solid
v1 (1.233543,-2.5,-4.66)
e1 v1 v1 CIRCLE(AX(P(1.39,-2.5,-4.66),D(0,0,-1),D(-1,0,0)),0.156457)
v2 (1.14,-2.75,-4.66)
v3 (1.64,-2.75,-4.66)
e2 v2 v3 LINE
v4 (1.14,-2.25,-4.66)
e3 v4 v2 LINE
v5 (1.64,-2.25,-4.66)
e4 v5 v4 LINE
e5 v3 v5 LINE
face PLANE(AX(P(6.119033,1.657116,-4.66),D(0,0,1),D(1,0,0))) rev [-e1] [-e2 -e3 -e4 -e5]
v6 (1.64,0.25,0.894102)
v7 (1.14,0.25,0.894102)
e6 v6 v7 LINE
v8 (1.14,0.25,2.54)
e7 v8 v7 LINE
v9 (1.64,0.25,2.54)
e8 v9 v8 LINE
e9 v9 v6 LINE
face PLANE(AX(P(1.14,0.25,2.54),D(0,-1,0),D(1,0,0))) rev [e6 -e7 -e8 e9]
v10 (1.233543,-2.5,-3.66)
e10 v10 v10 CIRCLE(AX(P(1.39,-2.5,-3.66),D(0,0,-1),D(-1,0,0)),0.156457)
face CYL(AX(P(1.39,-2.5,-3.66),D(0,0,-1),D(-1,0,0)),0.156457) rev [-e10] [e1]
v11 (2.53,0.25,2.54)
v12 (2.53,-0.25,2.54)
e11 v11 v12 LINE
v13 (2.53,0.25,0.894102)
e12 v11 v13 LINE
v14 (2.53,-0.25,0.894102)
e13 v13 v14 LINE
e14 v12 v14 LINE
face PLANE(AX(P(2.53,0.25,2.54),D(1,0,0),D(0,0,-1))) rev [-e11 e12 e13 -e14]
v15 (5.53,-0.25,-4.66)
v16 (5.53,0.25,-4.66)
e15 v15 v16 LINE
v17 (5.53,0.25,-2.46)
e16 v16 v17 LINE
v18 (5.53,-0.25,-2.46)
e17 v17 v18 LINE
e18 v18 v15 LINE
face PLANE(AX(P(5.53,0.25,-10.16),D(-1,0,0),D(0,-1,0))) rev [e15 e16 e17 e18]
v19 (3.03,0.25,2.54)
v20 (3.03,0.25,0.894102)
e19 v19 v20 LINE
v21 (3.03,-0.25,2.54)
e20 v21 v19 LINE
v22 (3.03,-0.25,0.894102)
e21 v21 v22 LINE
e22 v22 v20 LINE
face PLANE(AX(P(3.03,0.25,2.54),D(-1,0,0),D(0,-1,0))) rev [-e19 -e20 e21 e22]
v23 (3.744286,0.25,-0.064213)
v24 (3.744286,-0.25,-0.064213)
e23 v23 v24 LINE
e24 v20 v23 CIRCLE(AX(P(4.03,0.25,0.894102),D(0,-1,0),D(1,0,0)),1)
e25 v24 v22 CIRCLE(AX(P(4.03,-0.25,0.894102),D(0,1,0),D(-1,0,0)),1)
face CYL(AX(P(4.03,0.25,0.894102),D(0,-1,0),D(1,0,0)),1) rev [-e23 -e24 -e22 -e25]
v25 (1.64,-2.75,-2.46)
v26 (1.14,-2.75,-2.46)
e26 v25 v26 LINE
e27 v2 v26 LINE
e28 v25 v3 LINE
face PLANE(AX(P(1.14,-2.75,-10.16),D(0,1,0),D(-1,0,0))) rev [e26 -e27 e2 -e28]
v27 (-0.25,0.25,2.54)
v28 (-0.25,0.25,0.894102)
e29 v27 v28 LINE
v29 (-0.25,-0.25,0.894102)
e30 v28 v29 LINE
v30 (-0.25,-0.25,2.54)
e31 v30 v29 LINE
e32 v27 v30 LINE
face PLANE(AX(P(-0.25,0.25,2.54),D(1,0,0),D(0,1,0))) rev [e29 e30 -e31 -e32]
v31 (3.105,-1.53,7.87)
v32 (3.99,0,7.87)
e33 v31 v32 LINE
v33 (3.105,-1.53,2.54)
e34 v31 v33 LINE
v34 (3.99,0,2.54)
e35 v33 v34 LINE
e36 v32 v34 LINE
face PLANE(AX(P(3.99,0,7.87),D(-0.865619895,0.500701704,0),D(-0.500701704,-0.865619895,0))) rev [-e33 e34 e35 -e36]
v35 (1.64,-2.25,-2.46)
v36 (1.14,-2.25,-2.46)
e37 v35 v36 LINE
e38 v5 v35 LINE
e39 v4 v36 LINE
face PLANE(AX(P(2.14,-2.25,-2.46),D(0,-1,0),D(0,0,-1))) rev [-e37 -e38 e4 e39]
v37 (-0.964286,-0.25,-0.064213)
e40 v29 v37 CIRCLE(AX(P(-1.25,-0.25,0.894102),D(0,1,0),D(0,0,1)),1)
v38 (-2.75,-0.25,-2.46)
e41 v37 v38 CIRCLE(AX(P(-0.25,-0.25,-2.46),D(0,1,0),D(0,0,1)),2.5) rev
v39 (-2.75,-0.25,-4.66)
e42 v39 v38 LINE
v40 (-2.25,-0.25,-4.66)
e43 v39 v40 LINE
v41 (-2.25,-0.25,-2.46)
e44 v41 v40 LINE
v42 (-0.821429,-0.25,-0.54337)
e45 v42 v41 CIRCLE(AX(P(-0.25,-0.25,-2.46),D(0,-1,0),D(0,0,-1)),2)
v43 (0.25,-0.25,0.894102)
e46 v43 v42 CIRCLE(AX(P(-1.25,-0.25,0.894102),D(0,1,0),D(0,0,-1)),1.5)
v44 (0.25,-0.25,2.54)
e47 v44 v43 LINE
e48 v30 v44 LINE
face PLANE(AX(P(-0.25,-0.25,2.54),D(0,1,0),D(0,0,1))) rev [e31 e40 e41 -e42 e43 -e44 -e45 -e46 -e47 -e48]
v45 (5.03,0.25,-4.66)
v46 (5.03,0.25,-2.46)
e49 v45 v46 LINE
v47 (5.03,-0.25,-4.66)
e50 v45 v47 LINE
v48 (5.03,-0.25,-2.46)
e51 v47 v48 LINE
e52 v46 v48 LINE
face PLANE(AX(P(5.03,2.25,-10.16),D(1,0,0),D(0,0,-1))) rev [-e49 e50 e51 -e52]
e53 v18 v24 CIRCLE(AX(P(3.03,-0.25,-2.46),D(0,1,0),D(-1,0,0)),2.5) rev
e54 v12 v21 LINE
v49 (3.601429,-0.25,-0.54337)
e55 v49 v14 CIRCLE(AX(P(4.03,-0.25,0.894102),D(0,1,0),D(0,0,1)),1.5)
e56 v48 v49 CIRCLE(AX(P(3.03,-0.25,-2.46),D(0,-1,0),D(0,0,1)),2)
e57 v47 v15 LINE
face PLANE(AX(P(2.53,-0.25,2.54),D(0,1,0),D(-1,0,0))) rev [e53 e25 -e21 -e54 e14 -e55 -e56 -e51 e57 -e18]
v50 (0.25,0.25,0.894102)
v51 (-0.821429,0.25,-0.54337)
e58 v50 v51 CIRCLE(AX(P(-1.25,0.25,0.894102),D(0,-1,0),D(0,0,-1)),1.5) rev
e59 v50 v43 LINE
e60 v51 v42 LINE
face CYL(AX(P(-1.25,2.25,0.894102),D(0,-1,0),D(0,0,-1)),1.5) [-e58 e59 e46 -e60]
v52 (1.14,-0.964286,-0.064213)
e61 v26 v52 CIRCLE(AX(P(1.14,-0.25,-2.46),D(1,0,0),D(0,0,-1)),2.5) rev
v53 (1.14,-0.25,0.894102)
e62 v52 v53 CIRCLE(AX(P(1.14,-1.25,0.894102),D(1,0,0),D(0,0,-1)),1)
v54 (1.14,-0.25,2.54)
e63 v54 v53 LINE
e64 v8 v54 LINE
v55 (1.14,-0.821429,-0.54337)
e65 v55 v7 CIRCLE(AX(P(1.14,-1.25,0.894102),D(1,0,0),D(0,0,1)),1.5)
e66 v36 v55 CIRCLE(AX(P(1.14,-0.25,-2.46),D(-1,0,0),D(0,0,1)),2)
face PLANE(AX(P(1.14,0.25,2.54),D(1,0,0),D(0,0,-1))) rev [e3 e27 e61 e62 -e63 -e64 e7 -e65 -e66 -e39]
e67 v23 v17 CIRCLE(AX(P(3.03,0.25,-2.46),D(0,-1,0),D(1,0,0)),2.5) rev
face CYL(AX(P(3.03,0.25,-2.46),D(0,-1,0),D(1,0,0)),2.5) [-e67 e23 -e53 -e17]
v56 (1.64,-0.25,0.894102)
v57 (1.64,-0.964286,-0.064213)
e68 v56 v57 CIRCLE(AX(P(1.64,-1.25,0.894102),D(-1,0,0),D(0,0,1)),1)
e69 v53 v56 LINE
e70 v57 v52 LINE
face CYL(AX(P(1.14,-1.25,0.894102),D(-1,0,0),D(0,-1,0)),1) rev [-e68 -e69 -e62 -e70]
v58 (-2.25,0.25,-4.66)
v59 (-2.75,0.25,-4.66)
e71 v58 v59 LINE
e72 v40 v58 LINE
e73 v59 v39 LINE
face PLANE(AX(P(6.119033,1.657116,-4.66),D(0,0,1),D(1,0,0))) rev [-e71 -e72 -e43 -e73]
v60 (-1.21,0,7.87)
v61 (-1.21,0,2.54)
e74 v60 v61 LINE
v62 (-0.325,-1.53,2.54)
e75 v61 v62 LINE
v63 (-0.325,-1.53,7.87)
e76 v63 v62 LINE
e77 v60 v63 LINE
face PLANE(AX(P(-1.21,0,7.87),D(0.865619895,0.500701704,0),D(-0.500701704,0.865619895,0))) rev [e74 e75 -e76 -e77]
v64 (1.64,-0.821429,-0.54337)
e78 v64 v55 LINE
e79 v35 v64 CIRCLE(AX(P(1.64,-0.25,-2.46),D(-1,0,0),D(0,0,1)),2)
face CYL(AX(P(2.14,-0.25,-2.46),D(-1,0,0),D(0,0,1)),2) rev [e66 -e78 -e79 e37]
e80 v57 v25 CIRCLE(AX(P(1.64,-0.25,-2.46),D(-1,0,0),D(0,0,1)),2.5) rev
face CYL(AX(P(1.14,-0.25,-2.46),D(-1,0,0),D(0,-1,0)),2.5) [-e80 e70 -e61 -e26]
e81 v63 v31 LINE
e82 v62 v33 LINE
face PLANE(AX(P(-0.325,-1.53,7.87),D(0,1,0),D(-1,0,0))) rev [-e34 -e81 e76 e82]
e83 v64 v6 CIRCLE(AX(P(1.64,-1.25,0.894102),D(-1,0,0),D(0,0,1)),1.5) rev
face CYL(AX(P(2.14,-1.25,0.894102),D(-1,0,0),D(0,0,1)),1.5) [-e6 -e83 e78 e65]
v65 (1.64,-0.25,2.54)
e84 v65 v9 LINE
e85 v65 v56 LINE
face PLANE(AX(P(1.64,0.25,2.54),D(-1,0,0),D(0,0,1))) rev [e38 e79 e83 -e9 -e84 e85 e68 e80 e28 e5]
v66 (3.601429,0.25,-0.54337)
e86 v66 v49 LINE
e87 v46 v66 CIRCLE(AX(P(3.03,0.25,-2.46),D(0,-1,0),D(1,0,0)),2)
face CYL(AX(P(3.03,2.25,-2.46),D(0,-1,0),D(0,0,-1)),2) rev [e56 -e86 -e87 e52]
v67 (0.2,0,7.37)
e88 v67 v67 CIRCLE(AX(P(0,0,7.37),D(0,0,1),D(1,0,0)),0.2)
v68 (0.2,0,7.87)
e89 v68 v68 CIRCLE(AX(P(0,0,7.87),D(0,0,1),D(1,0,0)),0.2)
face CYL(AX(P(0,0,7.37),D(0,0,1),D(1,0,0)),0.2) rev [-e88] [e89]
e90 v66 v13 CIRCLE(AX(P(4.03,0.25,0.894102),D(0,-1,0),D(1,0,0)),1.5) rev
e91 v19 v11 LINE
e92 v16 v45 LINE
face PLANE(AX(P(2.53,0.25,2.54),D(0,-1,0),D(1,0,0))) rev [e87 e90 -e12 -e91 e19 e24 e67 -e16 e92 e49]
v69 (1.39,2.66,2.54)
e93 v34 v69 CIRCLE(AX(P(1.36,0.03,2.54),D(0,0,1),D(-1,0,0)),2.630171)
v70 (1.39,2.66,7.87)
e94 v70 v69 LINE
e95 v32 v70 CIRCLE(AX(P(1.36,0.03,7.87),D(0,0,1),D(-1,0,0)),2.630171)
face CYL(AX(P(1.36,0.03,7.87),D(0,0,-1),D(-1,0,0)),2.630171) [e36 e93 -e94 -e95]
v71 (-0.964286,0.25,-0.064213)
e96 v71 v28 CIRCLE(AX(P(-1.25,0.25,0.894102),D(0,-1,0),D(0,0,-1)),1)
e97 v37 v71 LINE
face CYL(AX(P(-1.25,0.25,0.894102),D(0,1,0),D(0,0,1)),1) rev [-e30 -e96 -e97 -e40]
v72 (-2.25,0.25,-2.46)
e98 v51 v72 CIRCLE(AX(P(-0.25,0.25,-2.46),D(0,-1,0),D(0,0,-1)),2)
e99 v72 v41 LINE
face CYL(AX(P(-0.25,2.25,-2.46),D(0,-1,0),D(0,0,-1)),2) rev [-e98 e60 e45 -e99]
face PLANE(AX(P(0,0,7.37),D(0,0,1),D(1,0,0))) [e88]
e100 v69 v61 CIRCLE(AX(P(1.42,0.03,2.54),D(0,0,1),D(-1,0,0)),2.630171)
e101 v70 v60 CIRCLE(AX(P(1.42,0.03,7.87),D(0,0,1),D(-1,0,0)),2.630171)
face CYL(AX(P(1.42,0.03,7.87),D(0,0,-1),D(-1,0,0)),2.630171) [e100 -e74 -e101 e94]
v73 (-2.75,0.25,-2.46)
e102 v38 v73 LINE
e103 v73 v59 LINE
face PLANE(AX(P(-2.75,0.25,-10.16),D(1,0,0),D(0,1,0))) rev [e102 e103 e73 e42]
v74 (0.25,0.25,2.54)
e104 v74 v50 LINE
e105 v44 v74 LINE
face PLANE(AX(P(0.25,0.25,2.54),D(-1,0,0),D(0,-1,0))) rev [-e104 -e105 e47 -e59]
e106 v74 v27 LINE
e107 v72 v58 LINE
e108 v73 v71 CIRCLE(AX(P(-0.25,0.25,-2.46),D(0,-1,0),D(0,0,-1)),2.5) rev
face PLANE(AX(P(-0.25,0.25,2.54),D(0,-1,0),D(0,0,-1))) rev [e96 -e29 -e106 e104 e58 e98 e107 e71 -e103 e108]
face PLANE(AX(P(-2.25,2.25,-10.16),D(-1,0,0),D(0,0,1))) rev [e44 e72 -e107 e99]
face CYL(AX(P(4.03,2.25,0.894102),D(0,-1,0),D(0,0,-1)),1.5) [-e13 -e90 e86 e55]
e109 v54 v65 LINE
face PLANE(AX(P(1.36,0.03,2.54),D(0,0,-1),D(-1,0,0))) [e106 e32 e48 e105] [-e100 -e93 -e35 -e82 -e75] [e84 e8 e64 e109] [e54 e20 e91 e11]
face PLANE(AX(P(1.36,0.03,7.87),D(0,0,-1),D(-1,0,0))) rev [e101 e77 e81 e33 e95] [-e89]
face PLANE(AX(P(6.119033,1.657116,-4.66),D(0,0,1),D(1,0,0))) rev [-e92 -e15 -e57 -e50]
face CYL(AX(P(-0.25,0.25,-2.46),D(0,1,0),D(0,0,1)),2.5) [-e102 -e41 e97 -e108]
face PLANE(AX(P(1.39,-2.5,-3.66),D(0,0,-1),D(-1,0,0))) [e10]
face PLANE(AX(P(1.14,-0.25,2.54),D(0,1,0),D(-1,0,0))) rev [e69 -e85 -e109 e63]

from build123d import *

# Parameters (mm, degrees)
EXTRUDE_1_DEPTH     = 5.33
SKETCH_1_W          = 0.5
SKETCH_1_H          = 0.5
EXTRUDE_2_DEPTH     = 2.54
SKETCH_1_2_W        = 0.5
SKETCH_1_2_H        = 0.5
EXTRUDE_3_DEPTH     = 10.16
SKETCH_4_R          = 0.2
CUT_EXTRUDE_1_DEPTH = 0.5
SKETCH_5_W          = 0.5
SKETCH_5_H          = 10.2
EXTRUDE_4_DEPTH     = 2.5
SKETCH_6_W          = 10.2
SKETCH_6_H          = 0.5
EXTRUDE_5_DEPTH     = 2.5
SKETCH_7_W          = 10.2
SKETCH_7_H          = 0.5
EXTRUDE_6_DEPTH     = 2.5
FILLET_1_R          = 2.5
FILLET_2_R          = 1
CUT_EXTRUDE_2_DEPTH = 2.5
CUT_EXTRUDE_3_DEPTH = 1
SKETCH_11_W         = 10.061772152
SKETCH_11_H         = 6.60723038
CUT_EXTRUDE_4_DEPTH = 5.5
SKETCH_12_R         = 0.156456915
CUT_EXTRUDE_5_DEPTH = 1


with BuildPart() as part:
    # Эскиз3 → Вытянуть1 (new body)
    with BuildSketch(Plane.XY.offset(2.54)):
        with BuildLine():
            Line((-0.325, -1.53), (3.105, -1.53))
            Line((3.105, -1.53), (3.99, 0))
            ThreePointArc((3.99, 0), (3.240904038, 1.868477631), (1.39, 2.66))
            ThreePointArc((1.39, 2.66), (-0.460904038, 1.868477631), (-1.21, 0))
            Line((-1.21, 0), (-0.325, -1.53))
        make_face()
    extrude(amount=EXTRUDE_1_DEPTH)

    # Эскиз1 → Вытянуть2 (add)
    with BuildSketch(Plane.XY):
        with Locations((1.39, 0)):
            Rectangle(SKETCH_1_W, SKETCH_1_H)
        Rectangle(SKETCH_1_W, SKETCH_1_H)
        with Locations((2.78, 0)):
            Rectangle(SKETCH_1_W, SKETCH_1_H)
    extrude(amount=EXTRUDE_2_DEPTH)

    # Эскиз1<2> → Вытянуть3 (add)
    with BuildSketch(Plane.XY):
        with Locations((1.39, 0)):
            Rectangle(SKETCH_1_2_W, SKETCH_1_2_H)
        Rectangle(SKETCH_1_2_W, SKETCH_1_2_H)
        with Locations((2.78, 0)):
            Rectangle(SKETCH_1_2_W, SKETCH_1_2_H)
    extrude(amount=-EXTRUDE_3_DEPTH)

    # Эскиз4 → Вырез-Вытянуть1 (cut)
    with BuildSketch(Plane.XY.offset(7.87)):
        Circle(SKETCH_4_R)
    extrude(amount=-CUT_EXTRUDE_1_DEPTH, mode=Mode.SUBTRACT)

    # Эскиз5 → Вытянуть4 (add)
    with BuildSketch(Plane(origin=(0, -0.25, 0), x_dir=(1, 0, 0), z_dir=(0, 1, 0))):
        with Locations((1.39, 5.06)):
            Rectangle(SKETCH_5_W, SKETCH_5_H)
    extrude(amount=-EXTRUDE_4_DEPTH)

    # Эскиз6 → Вытянуть5 (add)
    with BuildSketch(Plane.ZY.offset(0.25)):
        with Locations((-5.06, 0)):
            Rectangle(SKETCH_6_W, SKETCH_6_H)
    extrude(amount=EXTRUDE_5_DEPTH)

    # Эскиз7 → Вытянуть6 (add)
    with BuildSketch(Plane(origin=(3.03, 0, 0), x_dir=(0, 0, -1), z_dir=(1, 0, 0))):
        with Locations((5.06, 0)):
            Rectangle(SKETCH_7_W, SKETCH_7_H)
    extrude(amount=EXTRUDE_6_DEPTH)

    # Скругление1
    fillet_1_edges = [part.edges().sort_by_distance(p)[0] for p in [
        (5.53, 0, 0.04),
        (-2.75, 0, 0.04),
        (1.39, -2.75, 0.04),
    ]]
    fillet(fillet_1_edges, radius=FILLET_1_R - 0.0001)  # a hair under: the kernel refuses the full size

    # Скругление2
    fillet_2_edges = [part.edges().sort_by_distance(p)[0] for p in [
        (-0.25, 0, 0.04),
        (3.03, 0, 0.04),
        (1.39, -0.25, 0.04),
    ]]
    fillet(fillet_2_edges, radius=FILLET_2_R)

    # Эскиз9 → Вырез-Вытянуть2 (cut)
    with BuildSketch(Plane.XZ.offset(0.25)):
        with BuildLine():
            Line((-2.25, -10.16), (-2.25, -2.46))
            ThreePointArc((-2.25, -2.46), (-1.853567451, -1.264771391), (-0.821428571, -0.543370305))
            ThreePointArc((-0.821428571, -0.543370305), (-0.047324411, -0.002319491), (0.25, 0.894101966))
            Line((0.25, 0.894101966), (0.25, -10.16))
            Line((0.25, -10.16), (-2.25, -10.16))
        make_face()
        with BuildLine():
            Line((5.03, -10.16), (2.53, -10.16))
            Line((2.53, -10.16), (2.53, 0.894101966))
            ThreePointArc((2.53, 0.894101966), (2.827324411, -0.002319491), (3.601428571, -0.543370305))
            ThreePointArc((3.601428571, -0.543370305), (4.633567451, -1.264771391), (5.03, -2.46))
            Line((5.03, -2.46), (5.03, -10.16))
        make_face()
    extrude(amount=-CUT_EXTRUDE_2_DEPTH, mode=Mode.SUBTRACT)

    # Эскиз10 → Вырез-Вытянуть3 (cut)
    with BuildSketch(Plane.ZY.offset(-1.14)):
        with BuildLine():
            Line((-2.46, -2.25), (-10.16, -2.25))
            Line((-10.16, -2.25), (-10.16, 0.25))
            Line((-10.16, 0.25), (0.894101966, 0.25))
            ThreePointArc((0.894101966, 0.25), (-0.002319491, -0.047324411), (-0.543370305, -0.821428571))
            ThreePointArc((-0.543370305, -0.821428571), (-1.264771391, -1.853567451), (-2.46, -2.25))
        make_face()
    extrude(amount=-CUT_EXTRUDE_3_DEPTH, mode=Mode.SUBTRACT)

    # Эскиз11 → Вырез-Вытянуть4 (cut)
    with BuildSketch(Plane(origin=(0, 0, -10.16), x_dir=(-1, 0, 0), z_dir=(0, 0, -1))):
        with Locations((-1.088146835, -1.646498734)):
            Rectangle(SKETCH_11_W, SKETCH_11_H)
    extrude(amount=-CUT_EXTRUDE_4_DEPTH, mode=Mode.SUBTRACT)

    # Эскиз12 → Вырез-Вытянуть5 (cut)
    with BuildSketch(Plane(origin=(0, 0, -4.66), x_dir=(-1, 0, 0), z_dir=(0, 0, -1))):
        with Locations((-1.39, -2.5)):
            Circle(SKETCH_12_R)
    extrude(amount=-CUT_EXTRUDE_5_DEPTH, mode=Mode.SUBTRACT)


solid = part.part
